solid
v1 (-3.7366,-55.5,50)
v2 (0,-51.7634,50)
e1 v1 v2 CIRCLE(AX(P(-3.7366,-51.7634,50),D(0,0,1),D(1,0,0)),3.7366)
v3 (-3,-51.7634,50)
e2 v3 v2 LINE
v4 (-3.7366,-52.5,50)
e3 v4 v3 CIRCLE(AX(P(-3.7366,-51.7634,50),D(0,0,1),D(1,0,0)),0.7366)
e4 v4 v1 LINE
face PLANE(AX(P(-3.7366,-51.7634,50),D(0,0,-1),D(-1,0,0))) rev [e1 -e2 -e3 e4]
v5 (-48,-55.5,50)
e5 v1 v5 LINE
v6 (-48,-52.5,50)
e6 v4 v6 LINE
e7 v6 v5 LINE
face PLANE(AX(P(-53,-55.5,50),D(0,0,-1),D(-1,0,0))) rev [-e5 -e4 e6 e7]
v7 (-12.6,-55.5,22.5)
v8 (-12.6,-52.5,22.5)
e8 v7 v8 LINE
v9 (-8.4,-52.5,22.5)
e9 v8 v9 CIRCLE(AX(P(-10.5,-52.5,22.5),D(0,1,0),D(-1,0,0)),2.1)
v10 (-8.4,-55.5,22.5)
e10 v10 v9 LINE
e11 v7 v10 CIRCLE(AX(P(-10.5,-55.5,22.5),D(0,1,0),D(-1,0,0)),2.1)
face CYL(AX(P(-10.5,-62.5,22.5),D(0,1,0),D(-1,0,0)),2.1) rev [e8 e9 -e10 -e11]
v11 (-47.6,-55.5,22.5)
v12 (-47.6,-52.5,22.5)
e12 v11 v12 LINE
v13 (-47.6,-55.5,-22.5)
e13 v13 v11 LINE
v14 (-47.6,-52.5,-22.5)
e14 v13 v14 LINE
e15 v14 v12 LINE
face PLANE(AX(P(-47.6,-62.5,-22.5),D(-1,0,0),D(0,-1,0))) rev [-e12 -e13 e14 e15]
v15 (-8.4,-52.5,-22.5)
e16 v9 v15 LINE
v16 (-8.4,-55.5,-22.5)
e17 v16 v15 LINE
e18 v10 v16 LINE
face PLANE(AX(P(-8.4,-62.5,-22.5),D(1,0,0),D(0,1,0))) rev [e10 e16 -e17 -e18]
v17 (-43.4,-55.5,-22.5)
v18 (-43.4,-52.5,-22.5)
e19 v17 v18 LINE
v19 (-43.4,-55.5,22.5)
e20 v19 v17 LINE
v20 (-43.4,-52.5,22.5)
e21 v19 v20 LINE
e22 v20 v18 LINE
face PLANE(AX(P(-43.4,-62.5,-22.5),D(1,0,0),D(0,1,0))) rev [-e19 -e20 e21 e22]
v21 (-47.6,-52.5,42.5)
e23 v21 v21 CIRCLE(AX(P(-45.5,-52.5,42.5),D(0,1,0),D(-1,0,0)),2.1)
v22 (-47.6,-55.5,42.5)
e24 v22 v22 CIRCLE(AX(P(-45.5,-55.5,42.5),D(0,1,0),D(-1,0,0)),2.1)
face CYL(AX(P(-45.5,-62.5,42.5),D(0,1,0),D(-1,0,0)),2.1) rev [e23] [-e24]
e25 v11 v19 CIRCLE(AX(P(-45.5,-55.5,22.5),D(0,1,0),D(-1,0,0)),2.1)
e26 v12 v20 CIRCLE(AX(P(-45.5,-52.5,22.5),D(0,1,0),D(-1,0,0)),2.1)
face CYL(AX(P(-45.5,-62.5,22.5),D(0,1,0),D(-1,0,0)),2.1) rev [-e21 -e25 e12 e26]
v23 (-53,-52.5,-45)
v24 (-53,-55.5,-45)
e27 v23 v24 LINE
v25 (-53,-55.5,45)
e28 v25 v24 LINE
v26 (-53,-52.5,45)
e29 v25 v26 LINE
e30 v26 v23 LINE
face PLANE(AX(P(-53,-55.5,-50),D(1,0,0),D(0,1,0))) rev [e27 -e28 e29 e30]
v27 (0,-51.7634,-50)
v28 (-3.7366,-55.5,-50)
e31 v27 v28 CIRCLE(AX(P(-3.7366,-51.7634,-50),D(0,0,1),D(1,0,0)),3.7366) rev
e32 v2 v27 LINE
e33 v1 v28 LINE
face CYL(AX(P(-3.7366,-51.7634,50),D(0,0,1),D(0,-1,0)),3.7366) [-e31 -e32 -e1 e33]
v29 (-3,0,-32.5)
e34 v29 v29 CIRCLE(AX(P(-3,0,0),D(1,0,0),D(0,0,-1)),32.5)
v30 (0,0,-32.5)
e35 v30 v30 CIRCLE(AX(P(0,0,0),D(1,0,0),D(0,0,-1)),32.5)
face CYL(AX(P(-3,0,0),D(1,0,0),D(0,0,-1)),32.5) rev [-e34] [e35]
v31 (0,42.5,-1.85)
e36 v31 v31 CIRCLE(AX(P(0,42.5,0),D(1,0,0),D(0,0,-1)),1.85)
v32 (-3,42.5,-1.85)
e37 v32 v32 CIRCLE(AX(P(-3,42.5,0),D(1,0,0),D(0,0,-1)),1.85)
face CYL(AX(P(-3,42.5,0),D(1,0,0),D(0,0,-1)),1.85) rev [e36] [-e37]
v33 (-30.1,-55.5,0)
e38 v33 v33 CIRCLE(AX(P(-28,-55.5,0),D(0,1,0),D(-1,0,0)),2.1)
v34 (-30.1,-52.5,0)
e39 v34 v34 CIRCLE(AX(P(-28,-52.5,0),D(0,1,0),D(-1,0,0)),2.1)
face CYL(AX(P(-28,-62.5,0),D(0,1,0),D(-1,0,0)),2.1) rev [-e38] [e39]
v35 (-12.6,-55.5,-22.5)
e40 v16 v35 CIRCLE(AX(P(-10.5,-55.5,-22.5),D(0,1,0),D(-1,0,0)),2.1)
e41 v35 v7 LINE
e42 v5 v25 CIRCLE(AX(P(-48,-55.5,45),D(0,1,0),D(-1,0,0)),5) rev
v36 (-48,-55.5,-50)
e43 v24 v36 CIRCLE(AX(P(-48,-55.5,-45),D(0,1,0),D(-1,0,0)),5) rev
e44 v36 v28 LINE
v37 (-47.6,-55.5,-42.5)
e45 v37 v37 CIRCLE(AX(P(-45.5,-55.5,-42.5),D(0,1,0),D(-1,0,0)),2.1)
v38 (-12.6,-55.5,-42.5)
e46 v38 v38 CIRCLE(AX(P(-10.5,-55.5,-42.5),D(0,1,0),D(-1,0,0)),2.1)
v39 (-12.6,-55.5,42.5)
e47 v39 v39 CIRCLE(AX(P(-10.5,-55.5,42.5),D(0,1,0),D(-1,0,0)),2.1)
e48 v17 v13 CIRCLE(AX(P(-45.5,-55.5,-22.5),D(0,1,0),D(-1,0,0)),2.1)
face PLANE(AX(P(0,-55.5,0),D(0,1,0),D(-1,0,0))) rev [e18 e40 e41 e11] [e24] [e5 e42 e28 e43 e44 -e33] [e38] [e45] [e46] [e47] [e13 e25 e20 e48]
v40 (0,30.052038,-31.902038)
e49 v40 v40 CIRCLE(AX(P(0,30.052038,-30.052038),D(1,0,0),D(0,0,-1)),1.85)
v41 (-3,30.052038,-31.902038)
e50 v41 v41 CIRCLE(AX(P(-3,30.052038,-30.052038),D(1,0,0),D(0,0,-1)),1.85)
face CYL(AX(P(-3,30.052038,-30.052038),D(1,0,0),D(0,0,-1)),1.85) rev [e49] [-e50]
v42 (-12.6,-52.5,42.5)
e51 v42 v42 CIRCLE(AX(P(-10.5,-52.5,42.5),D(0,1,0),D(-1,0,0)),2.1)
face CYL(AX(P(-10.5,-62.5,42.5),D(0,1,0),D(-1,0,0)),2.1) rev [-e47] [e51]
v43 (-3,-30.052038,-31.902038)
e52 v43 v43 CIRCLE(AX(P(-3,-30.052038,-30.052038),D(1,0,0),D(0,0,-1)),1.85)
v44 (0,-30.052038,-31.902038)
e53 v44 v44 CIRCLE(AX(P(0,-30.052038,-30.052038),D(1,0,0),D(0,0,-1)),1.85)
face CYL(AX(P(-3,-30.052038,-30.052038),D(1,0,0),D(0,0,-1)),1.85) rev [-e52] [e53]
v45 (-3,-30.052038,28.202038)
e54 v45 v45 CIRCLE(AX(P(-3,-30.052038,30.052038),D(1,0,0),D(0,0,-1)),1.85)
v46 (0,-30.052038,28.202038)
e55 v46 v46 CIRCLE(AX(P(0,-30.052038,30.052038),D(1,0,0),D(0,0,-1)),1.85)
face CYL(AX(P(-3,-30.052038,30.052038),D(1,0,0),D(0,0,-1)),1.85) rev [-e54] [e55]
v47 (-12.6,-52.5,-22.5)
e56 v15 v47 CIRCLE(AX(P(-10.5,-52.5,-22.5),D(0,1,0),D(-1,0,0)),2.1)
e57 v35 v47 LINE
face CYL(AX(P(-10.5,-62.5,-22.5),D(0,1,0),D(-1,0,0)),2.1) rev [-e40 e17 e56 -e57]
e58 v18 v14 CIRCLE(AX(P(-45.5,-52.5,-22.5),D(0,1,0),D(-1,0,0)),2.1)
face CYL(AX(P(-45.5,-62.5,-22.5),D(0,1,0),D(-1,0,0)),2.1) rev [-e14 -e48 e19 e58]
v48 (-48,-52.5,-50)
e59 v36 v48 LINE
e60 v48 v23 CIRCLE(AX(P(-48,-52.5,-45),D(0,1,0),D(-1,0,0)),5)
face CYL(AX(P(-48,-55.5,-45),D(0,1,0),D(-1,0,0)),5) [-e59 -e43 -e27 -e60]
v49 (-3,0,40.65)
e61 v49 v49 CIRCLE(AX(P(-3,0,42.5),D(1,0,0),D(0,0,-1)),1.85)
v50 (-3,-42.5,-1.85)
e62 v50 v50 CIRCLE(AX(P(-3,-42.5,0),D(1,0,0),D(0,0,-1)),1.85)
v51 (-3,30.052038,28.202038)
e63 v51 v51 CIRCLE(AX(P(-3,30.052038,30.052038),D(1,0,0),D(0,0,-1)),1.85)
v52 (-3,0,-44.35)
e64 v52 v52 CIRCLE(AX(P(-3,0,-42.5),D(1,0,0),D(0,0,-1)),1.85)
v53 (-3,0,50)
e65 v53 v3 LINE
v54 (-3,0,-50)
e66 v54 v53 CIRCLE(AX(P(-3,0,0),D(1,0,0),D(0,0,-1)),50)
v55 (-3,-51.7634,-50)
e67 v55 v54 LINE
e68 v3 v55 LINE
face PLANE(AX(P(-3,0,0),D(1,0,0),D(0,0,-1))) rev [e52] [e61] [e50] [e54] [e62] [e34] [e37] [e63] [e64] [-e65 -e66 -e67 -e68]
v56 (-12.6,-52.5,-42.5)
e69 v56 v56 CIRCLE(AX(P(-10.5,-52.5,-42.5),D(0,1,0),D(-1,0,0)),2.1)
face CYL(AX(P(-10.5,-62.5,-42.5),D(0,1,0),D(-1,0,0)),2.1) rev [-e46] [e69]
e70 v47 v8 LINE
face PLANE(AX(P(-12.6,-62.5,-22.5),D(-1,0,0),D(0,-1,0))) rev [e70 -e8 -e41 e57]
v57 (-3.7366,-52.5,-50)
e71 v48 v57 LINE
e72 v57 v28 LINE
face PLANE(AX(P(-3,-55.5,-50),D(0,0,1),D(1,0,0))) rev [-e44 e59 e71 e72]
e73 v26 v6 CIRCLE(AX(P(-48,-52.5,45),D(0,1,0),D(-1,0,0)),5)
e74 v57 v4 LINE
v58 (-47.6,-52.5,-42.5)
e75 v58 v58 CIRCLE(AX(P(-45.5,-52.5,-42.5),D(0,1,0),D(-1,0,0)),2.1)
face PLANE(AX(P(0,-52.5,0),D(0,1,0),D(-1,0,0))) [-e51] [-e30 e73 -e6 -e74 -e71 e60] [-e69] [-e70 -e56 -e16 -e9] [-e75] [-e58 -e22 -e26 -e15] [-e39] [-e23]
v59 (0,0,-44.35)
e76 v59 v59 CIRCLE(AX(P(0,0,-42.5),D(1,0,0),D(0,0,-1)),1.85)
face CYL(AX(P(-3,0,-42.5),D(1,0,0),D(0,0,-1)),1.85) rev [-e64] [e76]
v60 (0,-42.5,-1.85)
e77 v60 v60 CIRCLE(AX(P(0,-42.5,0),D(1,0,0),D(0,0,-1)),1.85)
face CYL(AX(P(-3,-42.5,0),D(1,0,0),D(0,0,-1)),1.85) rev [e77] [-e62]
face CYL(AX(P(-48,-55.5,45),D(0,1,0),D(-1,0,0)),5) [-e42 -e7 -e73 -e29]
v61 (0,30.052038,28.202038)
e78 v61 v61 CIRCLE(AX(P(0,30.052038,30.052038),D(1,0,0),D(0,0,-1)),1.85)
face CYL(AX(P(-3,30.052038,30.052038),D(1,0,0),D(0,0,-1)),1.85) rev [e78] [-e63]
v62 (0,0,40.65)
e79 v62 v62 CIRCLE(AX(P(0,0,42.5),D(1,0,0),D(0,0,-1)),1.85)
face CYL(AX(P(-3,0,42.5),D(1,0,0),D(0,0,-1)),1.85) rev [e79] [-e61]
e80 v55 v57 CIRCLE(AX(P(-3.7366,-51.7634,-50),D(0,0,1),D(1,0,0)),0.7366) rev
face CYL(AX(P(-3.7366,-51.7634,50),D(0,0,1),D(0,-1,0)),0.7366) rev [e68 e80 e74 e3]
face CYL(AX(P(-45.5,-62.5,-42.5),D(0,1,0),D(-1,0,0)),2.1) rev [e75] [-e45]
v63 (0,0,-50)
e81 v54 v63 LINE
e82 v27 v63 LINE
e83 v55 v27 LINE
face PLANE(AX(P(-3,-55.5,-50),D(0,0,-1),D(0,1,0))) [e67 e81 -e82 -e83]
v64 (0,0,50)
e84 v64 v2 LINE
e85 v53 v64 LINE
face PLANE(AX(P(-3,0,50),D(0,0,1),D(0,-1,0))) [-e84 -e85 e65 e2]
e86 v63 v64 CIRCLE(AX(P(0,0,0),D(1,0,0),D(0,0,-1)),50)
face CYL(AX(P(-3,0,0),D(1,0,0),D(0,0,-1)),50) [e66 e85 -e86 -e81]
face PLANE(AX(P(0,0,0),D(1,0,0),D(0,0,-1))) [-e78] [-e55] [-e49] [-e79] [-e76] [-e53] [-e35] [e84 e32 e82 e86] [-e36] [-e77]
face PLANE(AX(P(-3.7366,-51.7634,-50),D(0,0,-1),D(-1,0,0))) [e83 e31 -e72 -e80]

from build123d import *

# Parameters (mm, degrees)
SKETCH_1_R                       = 1.85
SKETCH_1_R_2                     = 32.5
SM_BASE_FLANGE_1_DEPTH           = 3
SM_EDGE_FLANGE_1_STRIP_W         = 13.4732
SM_EDGE_FLANGE_1_STRIP_H         = 3
SM_EDGE_FLANGE_1_STRIP_CUT_DEPTH = 100
SM_EDGE_FLANGE_1_DEPTH           = 100
SKETCH_9_R                       = 2.1
CUT_EXTRUDE_1_DEPTH              = 10
FILLET_1_R                       = 5
SKETCH_10_R                      = 2.1
CUT_EXTRUDE_2_DEPTH              = 10


# Sheet-metal steps are written as plain solids
with BuildPart() as part:
    # Sketch 1 → 基体-法兰1 (new body)
    with BuildSketch(Plane(origin=(0, 0, 0), x_dir=(0, 0, -1), z_dir=(1, 0, 0))):
        with BuildLine():
            Line((-50, 0), (-50, -55.5))
            Line((-50, -55.5), (50, -55.5))
            Line((50, -55.5), (50, 0))
            ThreePointArc((50, 0), (0, 50), (-50, 0))
        make_face()
        with Locations((0, 42.5)):
            Circle(SKETCH_1_R, mode=Mode.SUBTRACT)
        with Locations((30.0520382, 30.0520382)):
            Circle(SKETCH_1_R, mode=Mode.SUBTRACT)
        with Locations((42.5, 0)):
            Circle(SKETCH_1_R, mode=Mode.SUBTRACT)
        with Locations((30.0520382, -30.0520382)):
            Circle(SKETCH_1_R, mode=Mode.SUBTRACT)
        with Locations((0, -42.5)):
            Circle(SKETCH_1_R, mode=Mode.SUBTRACT)
        with Locations((-30.0520382, -30.0520382)):
            Circle(SKETCH_1_R, mode=Mode.SUBTRACT)
        with Locations((-42.5, 0)):
            Circle(SKETCH_1_R, mode=Mode.SUBTRACT)
        with Locations((-30.0520382, 30.0520382)):
            Circle(SKETCH_1_R, mode=Mode.SUBTRACT)
        Circle(SKETCH_1_R_2, mode=Mode.SUBTRACT)
    extrude(amount=-SM_BASE_FLANGE_1_DEPTH)

    # 边线-法兰1 strip (across the edge) → 边线-法兰1 strip cut (cut)
    with BuildSketch(Plane(origin=(-3, -55.5, -50), x_dir=(0, 1, 0), z_dir=(0, 0, 1))):
        with Locations((-3, -1.5)):
            Rectangle(SM_EDGE_FLANGE_1_STRIP_W, SM_EDGE_FLANGE_1_STRIP_H)
    extrude(amount=SM_EDGE_FLANGE_1_STRIP_CUT_DEPTH, mode=Mode.SUBTRACT)

    # 边线-法兰1 section (across the edge) → 边线-法兰1 (add)
    with BuildSketch(Plane(origin=(-3, -55.5, -50), x_dir=(0, 1, 0), z_dir=(0, 0, 1))):
        with BuildLine():
            Line((0, 0.7366), (0, 50))
            Line((0, 50), (3, 50))
            Line((3, 50), (3, 0.7366))
            ThreePointArc((3, 0.7366), (3.215745145, 0.215745145), (3.7366, 0))
            Line((3.7366, 0), (3.7366, -3))
            ThreePointArc((3.7366, -3), (1.094424801, -1.905575199), (0, 0.7366))
        make_face()
    extrude(amount=SM_EDGE_FLANGE_1_DEPTH)

    # 草图9 → 切除-拉伸1 (cut)
    with BuildSketch(Plane(origin=(0, -52.5, 0), x_dir=(1, 0, 0), z_dir=(0, 1, 0))):
        with Locations(Location((-45.5, 42.5, 0), (0, 0, 180))):
            Circle(SKETCH_9_R)
        with Locations(Location((-10.5, 42.5, 0), (0, 0, 180))):
            Circle(SKETCH_9_R)
        with Locations(Location((-45.5, -42.5, 0), (0, 0, 180))):
            Circle(SKETCH_9_R)
        with Locations(Location((-10.5, -42.5, 0), (0, 0, 180))):
            Circle(SKETCH_9_R)
    extrude(amount=-CUT_EXTRUDE_1_DEPTH, mode=Mode.SUBTRACT)

    # 圆角1
    fillet_1_edges = [part.edges().sort_by_distance(p)[0] for p in [
        (-53, -54, -50),
        (-53, -54, 50),
    ]]
    fillet(fillet_1_edges, radius=FILLET_1_R)

    # 草图10 → 切除-拉伸2 (cut)
    with BuildSketch(Plane(origin=(0, -52.5, 0), x_dir=(1, 0, 0), z_dir=(0, 1, 0))):
        with Locations(Location((-28, 0, 0), (0, 0, 180))):
            Circle(SKETCH_10_R)
        with BuildLine():
            Line((-43.4, 22.5), (-43.4, -22.5))
            ThreePointArc((-43.4, -22.5), (-45.5, -24.6), (-47.6, -22.5))
            Line((-47.6, -22.5), (-47.6, 22.5))
            ThreePointArc((-47.6, 22.5), (-45.5, 24.6), (-43.4, 22.5))
        make_face()
        with BuildLine():
            Line((-8.4, 22.5), (-8.4, -22.5))
            ThreePointArc((-8.4, -22.5), (-10.5, -24.6), (-12.6, -22.5))
            Line((-12.6, -22.5), (-12.6, 22.5))
            ThreePointArc((-12.6, 22.5), (-10.5, 24.6), (-8.4, 22.5))
        make_face()
    extrude(amount=-CUT_EXTRUDE_2_DEPTH, mode=Mode.SUBTRACT)


solid = part.part
